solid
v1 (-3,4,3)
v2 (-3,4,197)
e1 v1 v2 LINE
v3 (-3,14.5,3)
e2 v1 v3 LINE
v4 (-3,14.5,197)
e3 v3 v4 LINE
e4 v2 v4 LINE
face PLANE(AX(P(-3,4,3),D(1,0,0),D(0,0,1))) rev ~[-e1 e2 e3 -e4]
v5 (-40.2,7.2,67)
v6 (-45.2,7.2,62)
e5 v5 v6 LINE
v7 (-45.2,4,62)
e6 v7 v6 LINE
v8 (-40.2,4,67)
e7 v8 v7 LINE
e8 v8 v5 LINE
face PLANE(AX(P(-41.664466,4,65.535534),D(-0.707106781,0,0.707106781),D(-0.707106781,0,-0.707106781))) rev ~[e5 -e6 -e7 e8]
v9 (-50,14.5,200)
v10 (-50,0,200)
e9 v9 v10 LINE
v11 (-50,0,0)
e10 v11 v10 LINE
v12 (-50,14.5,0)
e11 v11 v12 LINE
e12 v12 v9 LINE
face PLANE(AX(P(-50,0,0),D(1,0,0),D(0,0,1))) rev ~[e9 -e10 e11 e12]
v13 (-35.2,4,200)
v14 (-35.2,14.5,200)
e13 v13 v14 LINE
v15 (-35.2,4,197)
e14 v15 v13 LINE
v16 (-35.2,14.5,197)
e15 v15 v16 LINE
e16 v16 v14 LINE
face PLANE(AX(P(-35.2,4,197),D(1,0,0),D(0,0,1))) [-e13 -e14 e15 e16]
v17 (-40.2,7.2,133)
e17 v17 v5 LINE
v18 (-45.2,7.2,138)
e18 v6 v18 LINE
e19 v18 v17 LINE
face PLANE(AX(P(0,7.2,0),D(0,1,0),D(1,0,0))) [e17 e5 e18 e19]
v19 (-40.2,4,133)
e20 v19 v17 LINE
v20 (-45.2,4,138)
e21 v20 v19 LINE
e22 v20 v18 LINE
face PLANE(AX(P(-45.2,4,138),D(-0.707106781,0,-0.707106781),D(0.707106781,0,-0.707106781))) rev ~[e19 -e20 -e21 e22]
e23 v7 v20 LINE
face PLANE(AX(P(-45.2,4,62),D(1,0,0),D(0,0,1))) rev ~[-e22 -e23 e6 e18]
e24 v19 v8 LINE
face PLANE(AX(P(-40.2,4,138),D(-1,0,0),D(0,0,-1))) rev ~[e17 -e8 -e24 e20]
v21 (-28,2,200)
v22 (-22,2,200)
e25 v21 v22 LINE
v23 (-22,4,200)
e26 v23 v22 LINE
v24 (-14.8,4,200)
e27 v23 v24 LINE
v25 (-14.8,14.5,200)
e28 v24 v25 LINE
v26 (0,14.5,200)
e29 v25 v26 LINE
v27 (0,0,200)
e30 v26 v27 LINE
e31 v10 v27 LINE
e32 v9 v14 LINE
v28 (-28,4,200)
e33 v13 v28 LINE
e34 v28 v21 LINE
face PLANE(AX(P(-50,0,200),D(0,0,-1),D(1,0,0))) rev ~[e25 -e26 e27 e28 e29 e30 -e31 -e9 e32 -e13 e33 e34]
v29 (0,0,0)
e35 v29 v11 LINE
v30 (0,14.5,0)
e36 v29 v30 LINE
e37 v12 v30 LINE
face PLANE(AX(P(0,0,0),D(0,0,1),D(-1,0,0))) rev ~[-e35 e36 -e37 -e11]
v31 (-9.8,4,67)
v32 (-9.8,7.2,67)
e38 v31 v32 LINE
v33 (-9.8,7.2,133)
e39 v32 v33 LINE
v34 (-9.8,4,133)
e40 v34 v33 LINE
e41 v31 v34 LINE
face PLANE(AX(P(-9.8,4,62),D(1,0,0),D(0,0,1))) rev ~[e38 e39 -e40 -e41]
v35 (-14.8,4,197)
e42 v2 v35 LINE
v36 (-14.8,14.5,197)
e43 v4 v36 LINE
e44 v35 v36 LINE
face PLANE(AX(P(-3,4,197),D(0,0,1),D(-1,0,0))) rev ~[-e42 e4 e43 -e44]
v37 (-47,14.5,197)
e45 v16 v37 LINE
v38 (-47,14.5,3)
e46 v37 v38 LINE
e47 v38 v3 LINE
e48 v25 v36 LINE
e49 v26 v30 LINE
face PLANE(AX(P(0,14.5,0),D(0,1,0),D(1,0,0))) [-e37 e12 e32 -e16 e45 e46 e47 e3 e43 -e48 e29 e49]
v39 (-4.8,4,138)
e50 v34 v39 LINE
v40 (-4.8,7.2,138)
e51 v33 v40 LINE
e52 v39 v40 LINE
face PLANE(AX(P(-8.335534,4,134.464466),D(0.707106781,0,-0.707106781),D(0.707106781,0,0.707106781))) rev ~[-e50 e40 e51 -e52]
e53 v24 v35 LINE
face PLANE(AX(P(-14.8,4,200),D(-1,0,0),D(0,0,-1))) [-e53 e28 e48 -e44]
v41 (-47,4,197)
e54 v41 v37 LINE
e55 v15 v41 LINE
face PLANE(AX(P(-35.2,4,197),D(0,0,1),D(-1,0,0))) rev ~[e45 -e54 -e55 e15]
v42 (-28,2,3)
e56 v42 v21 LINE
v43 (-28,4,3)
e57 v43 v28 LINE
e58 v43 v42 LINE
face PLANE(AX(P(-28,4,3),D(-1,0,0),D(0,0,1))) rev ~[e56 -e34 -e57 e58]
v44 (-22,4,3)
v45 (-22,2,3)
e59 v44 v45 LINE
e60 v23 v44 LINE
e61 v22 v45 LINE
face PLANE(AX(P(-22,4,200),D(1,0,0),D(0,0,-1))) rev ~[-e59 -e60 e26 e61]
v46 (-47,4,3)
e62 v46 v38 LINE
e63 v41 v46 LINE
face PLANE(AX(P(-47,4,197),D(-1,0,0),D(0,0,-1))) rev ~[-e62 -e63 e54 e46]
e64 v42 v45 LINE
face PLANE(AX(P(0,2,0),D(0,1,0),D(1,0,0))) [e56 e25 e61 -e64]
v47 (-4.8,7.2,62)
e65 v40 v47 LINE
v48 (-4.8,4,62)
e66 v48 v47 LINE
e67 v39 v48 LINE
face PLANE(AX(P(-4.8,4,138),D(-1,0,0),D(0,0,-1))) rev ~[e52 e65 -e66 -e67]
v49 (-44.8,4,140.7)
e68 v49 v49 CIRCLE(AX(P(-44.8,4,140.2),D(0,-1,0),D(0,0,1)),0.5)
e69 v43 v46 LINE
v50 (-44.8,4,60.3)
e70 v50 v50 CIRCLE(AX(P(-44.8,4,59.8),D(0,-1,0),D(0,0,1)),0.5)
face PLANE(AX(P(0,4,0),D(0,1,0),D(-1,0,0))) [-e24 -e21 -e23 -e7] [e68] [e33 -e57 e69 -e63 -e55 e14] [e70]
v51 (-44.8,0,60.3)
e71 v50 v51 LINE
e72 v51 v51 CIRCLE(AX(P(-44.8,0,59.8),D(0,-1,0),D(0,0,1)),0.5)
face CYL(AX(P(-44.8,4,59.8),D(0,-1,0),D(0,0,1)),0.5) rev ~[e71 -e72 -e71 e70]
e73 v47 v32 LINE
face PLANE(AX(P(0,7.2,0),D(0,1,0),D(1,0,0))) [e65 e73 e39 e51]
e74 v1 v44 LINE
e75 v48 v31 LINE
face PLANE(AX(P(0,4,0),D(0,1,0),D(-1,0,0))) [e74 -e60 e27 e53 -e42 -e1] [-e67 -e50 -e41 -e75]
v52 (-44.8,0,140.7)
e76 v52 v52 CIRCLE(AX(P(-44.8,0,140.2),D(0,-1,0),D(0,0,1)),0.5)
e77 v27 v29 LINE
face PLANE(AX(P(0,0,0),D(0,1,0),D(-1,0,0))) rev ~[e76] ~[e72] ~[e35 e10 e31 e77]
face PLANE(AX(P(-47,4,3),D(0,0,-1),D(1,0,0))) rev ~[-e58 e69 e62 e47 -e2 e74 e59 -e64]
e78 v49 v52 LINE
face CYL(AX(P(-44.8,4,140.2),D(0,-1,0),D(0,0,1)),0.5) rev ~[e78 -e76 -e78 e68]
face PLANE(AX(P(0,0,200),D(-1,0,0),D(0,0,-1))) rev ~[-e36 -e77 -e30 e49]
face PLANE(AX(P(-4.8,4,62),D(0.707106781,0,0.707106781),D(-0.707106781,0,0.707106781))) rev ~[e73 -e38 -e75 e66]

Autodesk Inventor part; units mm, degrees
ref_plane "YZ Plane" through (0, 0, 0) normal (1, 0, 0) x (0, 1, 0)
ref_plane "XZ Plane" through (0, 0, 0) normal (0, 1, 0) x (-1, 0, 0)
ref_plane "XY Plane" through (0, 0, 0) normal (0, 0, 1) x (1, 0, 0)
sketch "Sketch1" plane through (0, 0, 0) normal (0, 1, 0) x (-1, 0, 0)
  line L0 (0, 0) -> (50, 0)
  line L1 (50, 0) -> (50, 200)
  line L2 (50, 200) -> (0, 200)
  line L3 (0, 200) -> (0, 0)
  dimension "d1" = 50
  dimension "d2" = 200
extrude "Base" add sketch "Sketch1" along normal blind 4
sketch "Sketch3" plane through (0, 4, 0) normal (0, 1, 0) x (1, 0, 0)
  line L0 (-50, 0) -> (-50, -200) projected
  line L1 (-50, -200) -> (0, -200) projected
  line L2 (0, -200) -> (0, 0) projected
  line L3 (0, 0) -> (-50, 0) projected
  line L4 (-47, -197) -> (-47, -3)
  line L5 (-47, -3) -> (-3, -3)
  line L6 (-3, -3) -> (-3, -197)
  line L7 (-3, -197) -> (-47, -197)
  line L8 (-25, -198.6939) -> (-25, 11.8917)
  line L9 (-35.2, -200) -> (-14.8, -200)
  line L10 (-14.8, -200) -> (-14.8, -197)
  line L11 (-14.8, -197) -> (-35.2, -197)
  line L12 (-35.2, -197) -> (-35.2, -200)
  point P0 (-25, 0)
  point P1 (-25, -200)
  point P2 (-25, -197)
  dimension "d10" = 3
  dimension "d11" = 20.4
extrude "Muros" add sketch "Sketch3" along normal blind 10.5 contours L3 L8 L5 L4 L7 L12 L1 L0 | L3 L2 L1 L10 L7 L6 L5 L8
sketch "Sketch4" plane through (0, 4, 0) normal (0, 1, 0) x (1, 0, 0)
  line L0 (-35.2, -200) -> (-14.8, -200) projected
  line L1 (-47, -3) -> (-3, -3) projected
  line L2 (-28, -200) -> (-22, -200)
  line L3 (-22, -200) -> (-22, -3)
  line L4 (-22, -3) -> (-28, -3)
  line L5 (-28, -3) -> (-28, -200)
  line L6 (-3, -3) -> (-47, -3) projected
  point P0 (0, 0)
  point P1 (-25, -3)
  point P2 (-25, -3)
  point P3 (-25, -200)
  dimension "d14" = 6
extrude "Rail" cut sketch "Sketch4" against normal blind 2
sketch "Sketch5" plane through (0, 4, 0) normal (0, 1, 0) x (1, 0, 0)
  line L0 (-45.2, -138) -> (-40.2, -138)
  line L1 (-40.2, -138) -> (-40.2, -62)
  line L2 (-40.2, -62) -> (-45.2, -62)
  line L3 (-45.2, -62) -> (-45.2, -138)
  line L4 (-9.8, -138) -> (-4.8, -138)
  line L5 (-4.8, -138) -> (-4.8, -62)
  line L6 (-4.8, -62) -> (-9.8, -62)
  line L7 (-9.8, -62) -> (-9.8, -138)
  line L8 (-28, -200) -> (-28, -3) projected
  line L9 (-22, -3) -> (-22, -200) projected
  line L10 (-35.2, -200) -> (-28, -200) projected
  line L11 (-22, -200) -> (-14.8, -200) projected
  line L12 (-40.2, -138) -> (-28, -138)
  line L13 (-9.8, -138) -> (-22, -138)
  line L14 (-22, -3) -> (-22, -200) projected
  line L15 (-40.2, -138) -> (-40.2, -200)
  point P0 (0, 0)
  dimension "d17" = 30.4
  dimension "d18" = 62
  dimension "d19" = 76
  dimension "d20" = 5
extrude "Extrusion4" add sketch "Sketch5" along normal blind 3.2
draft "FaceDraft1" angle 45 pull direction (1, 0, 0) faces at (-43.5333, 5.0667, 138) fixed edges at (-45.2, 5.6, 138)
draft "FaceDraft2" angle 45 pull direction (1, 0, 0) faces at (-41.8667, 5.0667, 62) fixed edges at (-45.2, 5.6, 62)
draft "FaceDraft3" angle 45 pull direction (-1, 0, 0) faces at (-8.1333, 5.0667, 138) fixed edges at (-4.8, 5.6, 138)
draft "FaceDraft4" angle 45 pull direction (-1, 0, 0) faces at (-6.4667, 5.0667, 62) fixed edges at (-4.8, 5.6, 62)
ref_plane "Work Plane1" through (0, 0, 100) normal (0, 0, -1) x (-1, 0, 0)
ref_plane "Work Plane2" through (-25, 0, 200) normal (1, 0, 0) x (0, 0, -1)
sketch "Sketch6" plane through (0, 4, 0) normal (0, 1, 0) x (1, 0, 0)
  line L0 (-45.2, -62) -> (-40.2, -67) projected
  line L1 (-45.2, -138) -> (-45.2, -62) projected
  line L2 (-47, -3) -> (-47, -197) projected
  line L3 (-40.2, -133) -> (-45.2, -138) projected
  point P0 (0, 0)
  point P1 (-44.8, -59.8)
  point P2 (-44.8, -140.2)
  dimension "d27" = 2.2
  dimension "d28" = 2.2
  dimension "d29" = 2.2
  dimension "d30" = 2.2
hole "Hole1" at (-44.8, 4, 59.8) at (-44.8, 4, 140.2) direction (0, -1, 0) diameter 1 end through all
equation "\"d1\" = base_ancho"
equation "\"d2\" = base_largo"
equation "\"d4\" = base_grosor"
equation "\"d10\" = base_muros_grosor"
equation "\"d11\" = base_muros_separación"
equation "\"d12\" = base_muros_alto"
equation "\"d14\" = base_rail_ancho"
equation "\"d15\" = base_rail_profundidad"
equation "\"d17\" = hoja_ancho + 2 * hoja_diente_ancho + 2 * general_margen"
equation "\"d18\" = -0.5 * base_deslizador_largo + 0.5 * base_largo"
equation "\"d19\" = base_deslizador_largo"
equation "\"d20\" = base_deslizador_ancho"
equation "\"d21\" = base_deslizador_alto"
equation "\"d23\" = base_deslizador_agarre"
equation "\"d24\" = base_deslizador_agarre"
equation "\"d25\" = base_deslizador_agarre"
equation "\"d26\" = base_deslizador_agarre"
equation "\"d27\" = base_traba_y"
equation "\"d28\" = base_traba_x"
equation "\"d29\" = base_traba_y"
equation "\"d30\" = base_traba_x"
equation "\"d31\" = traba_eje_diametro"
equation "\"base_ancho\" = 50"
equation "\"base_largo\" = 200"
equation "\"base_grosor\" = 4"
equation "\"base_muros_grosor\" = 3"
equation "\"base_muros_separación\" = 20.4"
equation "\"base_muros_alto\" = 10.5"
equation "\"base_rail_ancho\" = 6"
equation "\"base_rail_profundidad\" = 2"
equation "\"hoja_ancho\" = 20"
equation "\"hoja_diente_ancho\" = 5"
equation "\"general_margen\" = 0.2"
equation "\"base_deslizador_largo\" = 76"
equation "\"base_deslizador_ancho\" = 5"
equation "\"base_deslizador_alto\" = 3.2"
equation "\"base_deslizador_agarre\" = 45deg"
equation "\"traba_eje_diametro\" = 1"
equation "\"base_traba_y\" = 2.2"
equation "\"base_traba_x\" = 2.2"
properties part number "Base"
